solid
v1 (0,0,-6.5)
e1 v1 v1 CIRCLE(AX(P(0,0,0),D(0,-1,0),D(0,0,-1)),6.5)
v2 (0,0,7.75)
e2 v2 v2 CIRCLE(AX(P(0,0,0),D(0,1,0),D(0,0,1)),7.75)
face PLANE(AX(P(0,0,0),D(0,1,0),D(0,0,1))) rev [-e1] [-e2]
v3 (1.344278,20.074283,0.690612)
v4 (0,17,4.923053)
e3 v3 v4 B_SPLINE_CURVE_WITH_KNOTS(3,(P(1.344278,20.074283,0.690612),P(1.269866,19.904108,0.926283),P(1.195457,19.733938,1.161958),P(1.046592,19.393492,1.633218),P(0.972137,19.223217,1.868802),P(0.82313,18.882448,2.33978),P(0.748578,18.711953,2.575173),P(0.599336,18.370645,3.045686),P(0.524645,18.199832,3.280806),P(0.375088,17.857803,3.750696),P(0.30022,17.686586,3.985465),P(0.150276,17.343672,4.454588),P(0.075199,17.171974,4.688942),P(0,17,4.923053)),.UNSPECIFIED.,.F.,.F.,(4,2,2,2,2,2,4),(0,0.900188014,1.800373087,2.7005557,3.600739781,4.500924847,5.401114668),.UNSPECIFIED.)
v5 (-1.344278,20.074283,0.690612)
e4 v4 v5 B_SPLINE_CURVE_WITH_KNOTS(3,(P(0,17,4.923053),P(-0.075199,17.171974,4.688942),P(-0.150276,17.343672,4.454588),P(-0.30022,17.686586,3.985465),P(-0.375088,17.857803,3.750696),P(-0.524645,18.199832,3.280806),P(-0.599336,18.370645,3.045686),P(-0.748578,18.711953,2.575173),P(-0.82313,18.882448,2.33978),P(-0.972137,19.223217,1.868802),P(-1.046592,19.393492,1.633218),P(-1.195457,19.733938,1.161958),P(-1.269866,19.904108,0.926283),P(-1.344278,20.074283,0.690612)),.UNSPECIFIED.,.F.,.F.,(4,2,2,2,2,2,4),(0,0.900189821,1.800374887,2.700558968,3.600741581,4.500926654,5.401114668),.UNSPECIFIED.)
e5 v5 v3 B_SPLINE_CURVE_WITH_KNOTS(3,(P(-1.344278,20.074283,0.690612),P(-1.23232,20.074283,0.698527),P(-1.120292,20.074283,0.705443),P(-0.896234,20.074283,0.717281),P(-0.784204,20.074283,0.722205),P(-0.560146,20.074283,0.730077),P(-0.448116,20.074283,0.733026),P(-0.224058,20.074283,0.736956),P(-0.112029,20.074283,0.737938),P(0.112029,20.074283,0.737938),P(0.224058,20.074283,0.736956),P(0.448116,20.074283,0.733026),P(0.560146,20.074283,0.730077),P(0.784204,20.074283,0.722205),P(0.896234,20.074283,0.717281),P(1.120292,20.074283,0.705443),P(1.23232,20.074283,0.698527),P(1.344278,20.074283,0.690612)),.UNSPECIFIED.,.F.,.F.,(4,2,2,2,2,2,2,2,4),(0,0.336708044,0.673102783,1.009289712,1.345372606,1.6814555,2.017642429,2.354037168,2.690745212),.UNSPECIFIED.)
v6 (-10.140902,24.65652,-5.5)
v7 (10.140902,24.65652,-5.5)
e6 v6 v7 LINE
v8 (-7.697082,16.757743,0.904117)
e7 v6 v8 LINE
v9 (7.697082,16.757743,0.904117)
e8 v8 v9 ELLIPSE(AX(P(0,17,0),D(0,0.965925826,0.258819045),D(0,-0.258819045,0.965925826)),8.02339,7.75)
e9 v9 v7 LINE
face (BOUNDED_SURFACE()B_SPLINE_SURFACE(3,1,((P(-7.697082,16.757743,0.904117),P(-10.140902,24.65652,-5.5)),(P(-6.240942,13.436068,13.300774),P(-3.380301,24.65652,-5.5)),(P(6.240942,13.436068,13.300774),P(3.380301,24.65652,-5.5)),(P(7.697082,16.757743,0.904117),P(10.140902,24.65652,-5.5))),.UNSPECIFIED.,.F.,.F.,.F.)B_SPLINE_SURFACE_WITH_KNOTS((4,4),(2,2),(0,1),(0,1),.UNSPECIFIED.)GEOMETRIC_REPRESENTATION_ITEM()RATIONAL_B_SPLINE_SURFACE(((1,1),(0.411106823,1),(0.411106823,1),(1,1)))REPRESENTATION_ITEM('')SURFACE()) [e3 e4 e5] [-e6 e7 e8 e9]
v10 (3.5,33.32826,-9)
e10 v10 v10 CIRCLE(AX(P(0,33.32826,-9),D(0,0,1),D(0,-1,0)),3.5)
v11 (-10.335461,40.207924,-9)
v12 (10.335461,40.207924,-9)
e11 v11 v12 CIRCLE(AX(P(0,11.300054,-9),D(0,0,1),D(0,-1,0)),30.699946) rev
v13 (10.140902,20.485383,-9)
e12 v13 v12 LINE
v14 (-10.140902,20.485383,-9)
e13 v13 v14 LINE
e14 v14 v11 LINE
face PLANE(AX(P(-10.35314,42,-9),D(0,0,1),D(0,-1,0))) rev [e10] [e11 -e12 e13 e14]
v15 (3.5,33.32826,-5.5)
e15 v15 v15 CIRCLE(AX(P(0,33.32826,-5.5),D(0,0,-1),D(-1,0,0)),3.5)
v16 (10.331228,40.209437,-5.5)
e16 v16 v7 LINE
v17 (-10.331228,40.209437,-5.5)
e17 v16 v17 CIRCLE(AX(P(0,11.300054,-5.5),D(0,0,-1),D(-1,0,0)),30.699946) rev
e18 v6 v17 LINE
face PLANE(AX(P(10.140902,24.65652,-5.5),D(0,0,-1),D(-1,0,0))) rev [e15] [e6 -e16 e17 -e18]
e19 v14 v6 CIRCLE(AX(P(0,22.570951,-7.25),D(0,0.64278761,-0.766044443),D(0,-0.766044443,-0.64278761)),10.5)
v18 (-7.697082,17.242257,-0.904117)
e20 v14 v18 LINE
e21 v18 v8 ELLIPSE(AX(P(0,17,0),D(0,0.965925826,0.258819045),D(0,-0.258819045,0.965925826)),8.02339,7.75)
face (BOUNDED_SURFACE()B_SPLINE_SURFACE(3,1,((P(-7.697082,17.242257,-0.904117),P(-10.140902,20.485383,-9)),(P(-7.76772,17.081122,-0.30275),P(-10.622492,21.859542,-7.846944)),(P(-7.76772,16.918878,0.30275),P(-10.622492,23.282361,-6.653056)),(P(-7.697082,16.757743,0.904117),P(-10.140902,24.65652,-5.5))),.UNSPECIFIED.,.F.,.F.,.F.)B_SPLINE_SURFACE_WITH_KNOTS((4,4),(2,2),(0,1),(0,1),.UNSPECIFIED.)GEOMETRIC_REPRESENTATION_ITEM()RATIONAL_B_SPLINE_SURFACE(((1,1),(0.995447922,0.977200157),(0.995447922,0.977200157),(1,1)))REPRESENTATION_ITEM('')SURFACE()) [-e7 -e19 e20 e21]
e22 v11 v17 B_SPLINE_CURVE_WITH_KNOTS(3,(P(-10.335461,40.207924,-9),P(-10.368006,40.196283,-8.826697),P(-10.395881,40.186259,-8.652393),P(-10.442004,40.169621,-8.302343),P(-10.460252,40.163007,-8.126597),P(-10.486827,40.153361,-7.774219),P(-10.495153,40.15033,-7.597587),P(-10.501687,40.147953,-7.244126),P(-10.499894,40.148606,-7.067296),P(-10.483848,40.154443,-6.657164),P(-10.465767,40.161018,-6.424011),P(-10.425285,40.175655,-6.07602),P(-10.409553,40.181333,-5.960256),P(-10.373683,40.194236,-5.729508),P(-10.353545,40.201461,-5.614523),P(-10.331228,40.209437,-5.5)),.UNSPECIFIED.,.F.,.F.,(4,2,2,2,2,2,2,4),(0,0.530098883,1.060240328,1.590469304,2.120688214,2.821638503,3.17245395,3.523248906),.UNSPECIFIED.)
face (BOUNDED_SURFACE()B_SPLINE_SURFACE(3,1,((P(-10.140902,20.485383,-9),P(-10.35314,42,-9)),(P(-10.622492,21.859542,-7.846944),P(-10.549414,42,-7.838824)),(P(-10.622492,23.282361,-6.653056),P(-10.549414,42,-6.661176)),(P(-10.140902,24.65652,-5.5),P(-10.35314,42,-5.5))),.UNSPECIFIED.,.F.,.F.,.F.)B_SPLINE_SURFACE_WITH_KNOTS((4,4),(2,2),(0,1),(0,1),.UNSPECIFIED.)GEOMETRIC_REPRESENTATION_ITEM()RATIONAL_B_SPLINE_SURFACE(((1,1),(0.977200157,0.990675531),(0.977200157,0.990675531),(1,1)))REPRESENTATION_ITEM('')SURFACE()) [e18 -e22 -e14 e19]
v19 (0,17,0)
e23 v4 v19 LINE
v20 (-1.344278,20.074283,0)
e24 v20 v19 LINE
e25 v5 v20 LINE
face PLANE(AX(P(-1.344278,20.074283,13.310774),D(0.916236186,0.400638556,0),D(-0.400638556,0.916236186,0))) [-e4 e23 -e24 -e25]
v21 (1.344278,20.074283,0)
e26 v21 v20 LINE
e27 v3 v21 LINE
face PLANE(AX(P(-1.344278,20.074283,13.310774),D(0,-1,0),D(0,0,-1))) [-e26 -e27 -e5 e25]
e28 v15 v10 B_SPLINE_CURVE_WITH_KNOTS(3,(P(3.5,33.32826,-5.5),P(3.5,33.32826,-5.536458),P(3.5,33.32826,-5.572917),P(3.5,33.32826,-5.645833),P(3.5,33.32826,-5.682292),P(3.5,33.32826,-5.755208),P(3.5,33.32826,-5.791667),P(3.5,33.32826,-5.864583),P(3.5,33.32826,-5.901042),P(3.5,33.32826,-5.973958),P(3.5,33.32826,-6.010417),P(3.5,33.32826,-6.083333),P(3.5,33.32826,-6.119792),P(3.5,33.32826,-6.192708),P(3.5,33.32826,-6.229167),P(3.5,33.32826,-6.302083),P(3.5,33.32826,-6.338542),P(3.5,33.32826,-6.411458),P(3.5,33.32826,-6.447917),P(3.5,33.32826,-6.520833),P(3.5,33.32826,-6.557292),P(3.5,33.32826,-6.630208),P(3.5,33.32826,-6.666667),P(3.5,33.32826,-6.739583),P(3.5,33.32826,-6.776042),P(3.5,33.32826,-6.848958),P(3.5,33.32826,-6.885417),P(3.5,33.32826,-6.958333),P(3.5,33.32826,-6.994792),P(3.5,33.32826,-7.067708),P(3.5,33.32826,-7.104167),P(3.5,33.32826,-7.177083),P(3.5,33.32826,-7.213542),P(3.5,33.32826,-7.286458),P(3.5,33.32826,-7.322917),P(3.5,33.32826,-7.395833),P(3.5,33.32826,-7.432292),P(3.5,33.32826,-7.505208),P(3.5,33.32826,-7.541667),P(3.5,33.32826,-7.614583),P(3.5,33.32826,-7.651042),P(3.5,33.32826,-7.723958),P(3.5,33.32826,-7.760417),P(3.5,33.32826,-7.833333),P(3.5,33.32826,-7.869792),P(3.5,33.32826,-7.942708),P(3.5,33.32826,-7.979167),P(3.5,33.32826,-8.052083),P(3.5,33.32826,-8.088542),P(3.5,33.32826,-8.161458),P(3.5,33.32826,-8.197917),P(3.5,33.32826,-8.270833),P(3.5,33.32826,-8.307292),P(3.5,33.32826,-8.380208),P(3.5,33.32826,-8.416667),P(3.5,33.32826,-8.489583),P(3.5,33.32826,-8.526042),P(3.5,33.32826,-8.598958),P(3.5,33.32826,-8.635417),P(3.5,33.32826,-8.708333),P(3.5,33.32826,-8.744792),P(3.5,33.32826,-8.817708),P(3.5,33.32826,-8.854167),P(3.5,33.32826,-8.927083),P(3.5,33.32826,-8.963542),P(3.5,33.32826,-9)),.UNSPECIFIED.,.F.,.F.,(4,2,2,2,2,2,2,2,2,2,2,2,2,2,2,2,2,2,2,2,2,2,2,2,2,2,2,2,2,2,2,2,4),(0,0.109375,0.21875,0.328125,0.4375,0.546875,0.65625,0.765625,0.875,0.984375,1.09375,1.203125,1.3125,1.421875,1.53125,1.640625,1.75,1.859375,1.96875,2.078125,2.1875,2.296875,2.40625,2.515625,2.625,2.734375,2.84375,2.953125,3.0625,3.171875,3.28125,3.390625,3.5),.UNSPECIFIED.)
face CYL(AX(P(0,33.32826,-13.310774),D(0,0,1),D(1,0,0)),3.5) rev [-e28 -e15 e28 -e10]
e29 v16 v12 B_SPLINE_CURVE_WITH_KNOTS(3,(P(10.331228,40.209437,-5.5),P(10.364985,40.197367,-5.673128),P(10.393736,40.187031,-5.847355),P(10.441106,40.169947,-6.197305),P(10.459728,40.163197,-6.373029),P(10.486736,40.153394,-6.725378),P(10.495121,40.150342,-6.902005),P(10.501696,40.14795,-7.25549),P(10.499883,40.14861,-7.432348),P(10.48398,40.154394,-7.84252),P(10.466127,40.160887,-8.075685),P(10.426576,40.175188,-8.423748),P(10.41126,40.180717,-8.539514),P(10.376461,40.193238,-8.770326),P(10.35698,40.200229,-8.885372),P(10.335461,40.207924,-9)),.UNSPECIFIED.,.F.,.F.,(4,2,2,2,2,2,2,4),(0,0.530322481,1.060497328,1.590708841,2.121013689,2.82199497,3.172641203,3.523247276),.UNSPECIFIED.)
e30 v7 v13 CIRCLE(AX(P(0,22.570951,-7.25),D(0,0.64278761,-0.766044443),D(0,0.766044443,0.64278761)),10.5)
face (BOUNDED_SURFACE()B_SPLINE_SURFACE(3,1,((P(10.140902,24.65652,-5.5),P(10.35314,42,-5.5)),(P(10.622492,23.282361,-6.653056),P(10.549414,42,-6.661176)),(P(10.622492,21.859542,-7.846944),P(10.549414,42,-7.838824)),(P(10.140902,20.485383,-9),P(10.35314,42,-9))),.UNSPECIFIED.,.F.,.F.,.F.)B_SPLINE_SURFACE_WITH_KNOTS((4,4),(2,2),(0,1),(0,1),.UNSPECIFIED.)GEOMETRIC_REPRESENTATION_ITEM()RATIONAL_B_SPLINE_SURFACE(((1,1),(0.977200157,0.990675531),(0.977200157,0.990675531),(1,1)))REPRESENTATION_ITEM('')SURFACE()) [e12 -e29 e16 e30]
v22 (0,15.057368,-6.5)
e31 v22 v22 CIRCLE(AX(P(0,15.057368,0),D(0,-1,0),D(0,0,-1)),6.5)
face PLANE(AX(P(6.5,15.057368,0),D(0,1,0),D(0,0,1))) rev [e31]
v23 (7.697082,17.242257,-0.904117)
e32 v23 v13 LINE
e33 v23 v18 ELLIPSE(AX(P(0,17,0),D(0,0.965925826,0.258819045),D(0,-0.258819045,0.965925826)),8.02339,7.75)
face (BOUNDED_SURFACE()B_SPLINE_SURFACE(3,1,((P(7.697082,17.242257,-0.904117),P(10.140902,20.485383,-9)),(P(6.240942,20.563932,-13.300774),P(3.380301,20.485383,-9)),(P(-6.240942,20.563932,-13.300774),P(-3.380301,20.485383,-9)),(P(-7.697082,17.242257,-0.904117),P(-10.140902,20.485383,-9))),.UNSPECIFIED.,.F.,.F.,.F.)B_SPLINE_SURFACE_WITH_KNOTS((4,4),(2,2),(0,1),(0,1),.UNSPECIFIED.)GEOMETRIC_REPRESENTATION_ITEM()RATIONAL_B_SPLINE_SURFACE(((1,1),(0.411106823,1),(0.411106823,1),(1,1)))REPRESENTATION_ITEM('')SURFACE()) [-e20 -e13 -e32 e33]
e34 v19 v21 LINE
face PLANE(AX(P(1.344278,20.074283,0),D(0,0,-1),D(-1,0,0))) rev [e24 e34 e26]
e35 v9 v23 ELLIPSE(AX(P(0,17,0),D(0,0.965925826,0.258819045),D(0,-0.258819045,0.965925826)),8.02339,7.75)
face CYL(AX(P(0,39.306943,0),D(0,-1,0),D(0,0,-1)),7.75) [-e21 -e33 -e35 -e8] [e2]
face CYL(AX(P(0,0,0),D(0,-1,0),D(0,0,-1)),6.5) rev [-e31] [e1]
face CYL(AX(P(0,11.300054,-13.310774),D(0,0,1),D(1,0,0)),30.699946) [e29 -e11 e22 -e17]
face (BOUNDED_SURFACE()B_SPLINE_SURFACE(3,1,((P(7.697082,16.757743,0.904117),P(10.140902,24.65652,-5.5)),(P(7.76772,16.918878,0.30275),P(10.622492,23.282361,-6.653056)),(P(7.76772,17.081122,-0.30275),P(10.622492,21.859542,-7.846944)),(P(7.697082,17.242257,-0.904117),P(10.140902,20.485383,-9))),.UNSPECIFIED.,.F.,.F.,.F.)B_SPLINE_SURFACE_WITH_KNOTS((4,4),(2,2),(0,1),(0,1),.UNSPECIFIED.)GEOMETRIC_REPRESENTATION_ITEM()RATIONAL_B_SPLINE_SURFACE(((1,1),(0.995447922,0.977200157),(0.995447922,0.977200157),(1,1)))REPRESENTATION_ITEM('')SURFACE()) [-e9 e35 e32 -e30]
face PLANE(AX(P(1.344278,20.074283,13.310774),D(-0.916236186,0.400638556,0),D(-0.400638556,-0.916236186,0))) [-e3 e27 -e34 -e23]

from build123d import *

# Parameters (mm, degrees)
BODY_SHAFT_OUTLINE_R      = 7.75
BODY_SHAFT_DEPTH          = 14.923393759
BODY_SHAFT_START          = 14.923393759
BODY_SHAFT_2_OUTLINE_R    = 7.75
BODY_SHAFT_2_DEPTH        = 4.153212482
BODY_SHAFT_START_2        = 16.420739047
BODY_SHAFT_3_OUTLINE_W    = 18
BODY_SHAFT_3_OUTLINE_H    = 19
BODY_SHAFT_3_DEPTH        = 4.579260953
SKETCH26_W                = 6.5
SKETCH26_H                = 15.057368355
SKETCH9_R                 = 3.5
CUT_HOLE_DEPTH            = 45.218209058
CUT_SHOE_RADIUS_DEPTH     = 45.218209058
CUT_INSPECTION_HOLE_DEPTH = 45.218209058


with BuildPart() as part:
    # Body-Shaft: read off the stored shape, not the designer's step
    # Body-Shaft outline → Body-Shaft (new body)
    with BuildSketch(Plane(origin=(0, 0, 0), x_dir=(1, 0, 0), z_dir=(0, 1, 0))):
        Circle(BODY_SHAFT_OUTLINE_R)
    extrude(amount=BODY_SHAFT_DEPTH)

    # Body-Shaft 2 outline → Body-Shaft 2 (add)
    with BuildSketch(Plane(origin=(0, 0, 0), x_dir=(1, 0, 0), z_dir=(0, 1, 0)).offset(BODY_SHAFT_START)):
        Circle(BODY_SHAFT_2_OUTLINE_R)
    extrude(amount=BODY_SHAFT_2_DEPTH)

    # Body-Shaft 3 outline → Body-Shaft 3 (cut)
    with BuildSketch(Plane(origin=(0, 0, 0), x_dir=(1, 0, 0), z_dir=(0, 0.9659258262890682, 0.2588190451025211)).offset(BODY_SHAFT_START_2)):
        with Locations((0, 4.5)):
            Rectangle(BODY_SHAFT_3_OUTLINE_W, BODY_SHAFT_3_OUTLINE_H)
    extrude(amount=BODY_SHAFT_3_DEPTH, mode=Mode.SUBTRACT)

    # Sketch26 → Cut-Shaft (revolve, cut)
    with BuildSketch(Plane.XY, mode=Mode.PRIVATE) as cut_shaft_sk:
        with Locations((3.25, 7.528684178)):
            Rectangle(SKETCH26_W, SKETCH26_H)
    revolve(cut_shaft_sk.sketch.rotate(Axis((0, 0, 0), (0, 1, 0)), 270), axis=Axis((0, 0, 0), (0, 1, 0)), mode=Mode.SUBTRACT)

    # Body-Transition: read off the stored shape, not the designer's step
    # Body-Transition: loft between two sections, ruled curve by curve
    body_transition_from = [
        Edge.make_bspline([(-7.697082096, 16.75774263, 0.904116814), (-6.240942475, 13.436068349, 13.300773997), (6.240942475, 13.436068349, 13.300773997), (7.697082096, 16.75774263, 0.904116814)], [0, 0, 0, 0, 1, 1, 1, 1], 3, [1, 0.411106823, 0.411106823, 1]),
        Edge.make_bspline([(7.697082096, 16.75774263, 0.904116814), (7.767719964, 16.918878271, 0.302750415), (7.767719964, 17.081121729, -0.302750415), (7.697082096, 17.24225737, -0.904116814)], [0, 0, 0, 0, 1, 1, 1, 1], 3, [1, 0.995447922, 0.995447922, 1]),
        Edge.make_bspline([(-7.697082096, 17.24225737, -0.904116814), (-7.767719964, 17.081121729, -0.302750415), (-7.767719964, 16.918878271, 0.302750415), (-7.697082096, 16.75774263, 0.904116814)], [0, 0, 0, 0, 1, 1, 1, 1], 3, [1, 0.995447922, 0.995447922, 1]),
        Edge.make_bspline([(7.697082096, 17.24225737, -0.904116814), (6.240942475, 20.563931651, -13.300773997), (-6.240942475, 20.563931651, -13.300773997), (-7.697082096, 17.24225737, -0.904116814)], [0, 0, 0, 0, 1, 1, 1, 1], 3, [1, 0.411106823, 0.411106823, 1]),
    ]
    body_transition_to = [
        Edge.make_bspline([(-10.140902466, 24.656520189, -5.5), (-3.380300822, 24.656520189, -5.5), (3.380300822, 24.656520189, -5.5), (10.140902466, 24.656520189, -5.5)], [0, 0, 0, 0, 1, 1, 1, 1], 3),
        Edge.make_bspline([(10.140902466, 24.656520189, -5.5), (10.622491976, 23.282361026, -6.653056447), (10.622491976, 21.859541778, -7.846943553), (10.140902466, 20.485382615, -9)], [0, 0, 0, 0, 1, 1, 1, 1], 3, [1, 0.977200157, 0.977200157, 1]),
        Edge.make_bspline([(-10.140902466, 20.485382615, -9), (-10.622491976, 21.859541778, -7.846943553), (-10.622491976, 23.282361026, -6.653056447), (-10.140902466, 24.656520189, -5.5)], [0, 0, 0, 0, 1, 1, 1, 1], 3, [1, 0.977200157, 0.977200157, 1]),
        Edge.make_bspline([(10.140902466, 20.485382615, -9), (3.380300822, 20.485382615, -9), (-3.380300822, 20.485382615, -9), (-10.140902466, 20.485382615, -9)], [0, 0, 0, 0, 1, 1, 1, 1], 3),
    ]
    body_transition = Solid(Shell([*[Face.make_surface_from_curves(body_transition_from[k], body_transition_to[k]) for k in range(4)], Face(Wire(body_transition_from)), Face(Wire(body_transition_to))]))
    add(body_transition)

    # Sketch11 for Body-Shoe → Body-Shoe section 0
    with BuildSketch(Plane(origin=(0, 12.895701516, -15.368498611), x_dir=(-1, 0, 0), z_dir=(1.0474450083328146e-14, 0.6427876096865438, -0.7660444431189743))):
        with BuildLine():
            Line((10.140902466, 9.90762503), (-10.140902466, 9.90762503))
            # circular arc as an exact rational Bezier (weights 1, cos(half-angle), 1)
            Bezier((-10.140902466, 9.90762503), (-10.871813467, 12.630141727), (-10.140902466, 15.352658424), weights=[1, 0.965800235, 1])
            Line((-10.140902466, 15.352658424), (10.140902466, 15.352658424))
            Bezier((10.140902466, 15.352658424), (10.871813467, 12.630141727), (10.140902466, 9.90762503), weights=[1, 0.965800235, 1])
        make_face()
    # Sketch12 for Body-Shoe → Body-Shoe section 1
    with BuildSketch(Plane(origin=(0, 42, 0), x_dir=(-1, 0, 0), z_dir=(0, 1, 0))):
        with BuildLine():
            Line((-10.35313962, -5.5), (10.35313962, -5.5))
            Bezier((10.35313962, -5.5), (10.64894361, -7.25), (10.35313962, -9), weights=[1, 0.986013297, 1])
            Line((10.35313962, -9), (-10.35313962, -9))
            Bezier((-10.35313962, -9), (-10.64894361, -7.25), (-10.35313962, -5.5), weights=[1, 0.986013297, 1])
        make_face()
    loft()

    # Sketch9 → Cut-Hole (cut, through all)
    with BuildSketch(Plane(origin=(0, 0, 0), x_dir=(-1, 0, 0), z_dir=(0, 0, 1))):
        with Locations(Location((0, -33.328260094, 0), (0, 0, 180))):
            Circle(SKETCH9_R)
    extrude(amount=-CUT_HOLE_DEPTH, mode=Mode.SUBTRACT)

    # Sketch15 → Cut-Shoe-Radius (cut, through all)
    with BuildSketch(Plane.XY):
        with BuildLine():
            Line((10.5, 40.148566703), (10.5, 43.851433297))
            Line((10.5, 43.851433297), (-10.5, 43.851433297))
            Line((-10.5, 43.851433297), (-10.5, 40.148566703))
            ThreePointArc((-10.5, 40.148566703), (0, 42), (10.5, 40.148566703))
        make_face()
    extrude(amount=-CUT_SHOE_RADIUS_DEPTH, mode=Mode.SUBTRACT)

    # Sketch17 → Cut-Inspection-Hole (cut, through all)
    with BuildSketch(Plane.XY):
        Polygon((-1.344278322, 20.074283351), (0, 17), (1.344278322, 20.074283351), align=None)
    extrude(amount=CUT_INSPECTION_HOLE_DEPTH, mode=Mode.SUBTRACT)


solid = part.part
